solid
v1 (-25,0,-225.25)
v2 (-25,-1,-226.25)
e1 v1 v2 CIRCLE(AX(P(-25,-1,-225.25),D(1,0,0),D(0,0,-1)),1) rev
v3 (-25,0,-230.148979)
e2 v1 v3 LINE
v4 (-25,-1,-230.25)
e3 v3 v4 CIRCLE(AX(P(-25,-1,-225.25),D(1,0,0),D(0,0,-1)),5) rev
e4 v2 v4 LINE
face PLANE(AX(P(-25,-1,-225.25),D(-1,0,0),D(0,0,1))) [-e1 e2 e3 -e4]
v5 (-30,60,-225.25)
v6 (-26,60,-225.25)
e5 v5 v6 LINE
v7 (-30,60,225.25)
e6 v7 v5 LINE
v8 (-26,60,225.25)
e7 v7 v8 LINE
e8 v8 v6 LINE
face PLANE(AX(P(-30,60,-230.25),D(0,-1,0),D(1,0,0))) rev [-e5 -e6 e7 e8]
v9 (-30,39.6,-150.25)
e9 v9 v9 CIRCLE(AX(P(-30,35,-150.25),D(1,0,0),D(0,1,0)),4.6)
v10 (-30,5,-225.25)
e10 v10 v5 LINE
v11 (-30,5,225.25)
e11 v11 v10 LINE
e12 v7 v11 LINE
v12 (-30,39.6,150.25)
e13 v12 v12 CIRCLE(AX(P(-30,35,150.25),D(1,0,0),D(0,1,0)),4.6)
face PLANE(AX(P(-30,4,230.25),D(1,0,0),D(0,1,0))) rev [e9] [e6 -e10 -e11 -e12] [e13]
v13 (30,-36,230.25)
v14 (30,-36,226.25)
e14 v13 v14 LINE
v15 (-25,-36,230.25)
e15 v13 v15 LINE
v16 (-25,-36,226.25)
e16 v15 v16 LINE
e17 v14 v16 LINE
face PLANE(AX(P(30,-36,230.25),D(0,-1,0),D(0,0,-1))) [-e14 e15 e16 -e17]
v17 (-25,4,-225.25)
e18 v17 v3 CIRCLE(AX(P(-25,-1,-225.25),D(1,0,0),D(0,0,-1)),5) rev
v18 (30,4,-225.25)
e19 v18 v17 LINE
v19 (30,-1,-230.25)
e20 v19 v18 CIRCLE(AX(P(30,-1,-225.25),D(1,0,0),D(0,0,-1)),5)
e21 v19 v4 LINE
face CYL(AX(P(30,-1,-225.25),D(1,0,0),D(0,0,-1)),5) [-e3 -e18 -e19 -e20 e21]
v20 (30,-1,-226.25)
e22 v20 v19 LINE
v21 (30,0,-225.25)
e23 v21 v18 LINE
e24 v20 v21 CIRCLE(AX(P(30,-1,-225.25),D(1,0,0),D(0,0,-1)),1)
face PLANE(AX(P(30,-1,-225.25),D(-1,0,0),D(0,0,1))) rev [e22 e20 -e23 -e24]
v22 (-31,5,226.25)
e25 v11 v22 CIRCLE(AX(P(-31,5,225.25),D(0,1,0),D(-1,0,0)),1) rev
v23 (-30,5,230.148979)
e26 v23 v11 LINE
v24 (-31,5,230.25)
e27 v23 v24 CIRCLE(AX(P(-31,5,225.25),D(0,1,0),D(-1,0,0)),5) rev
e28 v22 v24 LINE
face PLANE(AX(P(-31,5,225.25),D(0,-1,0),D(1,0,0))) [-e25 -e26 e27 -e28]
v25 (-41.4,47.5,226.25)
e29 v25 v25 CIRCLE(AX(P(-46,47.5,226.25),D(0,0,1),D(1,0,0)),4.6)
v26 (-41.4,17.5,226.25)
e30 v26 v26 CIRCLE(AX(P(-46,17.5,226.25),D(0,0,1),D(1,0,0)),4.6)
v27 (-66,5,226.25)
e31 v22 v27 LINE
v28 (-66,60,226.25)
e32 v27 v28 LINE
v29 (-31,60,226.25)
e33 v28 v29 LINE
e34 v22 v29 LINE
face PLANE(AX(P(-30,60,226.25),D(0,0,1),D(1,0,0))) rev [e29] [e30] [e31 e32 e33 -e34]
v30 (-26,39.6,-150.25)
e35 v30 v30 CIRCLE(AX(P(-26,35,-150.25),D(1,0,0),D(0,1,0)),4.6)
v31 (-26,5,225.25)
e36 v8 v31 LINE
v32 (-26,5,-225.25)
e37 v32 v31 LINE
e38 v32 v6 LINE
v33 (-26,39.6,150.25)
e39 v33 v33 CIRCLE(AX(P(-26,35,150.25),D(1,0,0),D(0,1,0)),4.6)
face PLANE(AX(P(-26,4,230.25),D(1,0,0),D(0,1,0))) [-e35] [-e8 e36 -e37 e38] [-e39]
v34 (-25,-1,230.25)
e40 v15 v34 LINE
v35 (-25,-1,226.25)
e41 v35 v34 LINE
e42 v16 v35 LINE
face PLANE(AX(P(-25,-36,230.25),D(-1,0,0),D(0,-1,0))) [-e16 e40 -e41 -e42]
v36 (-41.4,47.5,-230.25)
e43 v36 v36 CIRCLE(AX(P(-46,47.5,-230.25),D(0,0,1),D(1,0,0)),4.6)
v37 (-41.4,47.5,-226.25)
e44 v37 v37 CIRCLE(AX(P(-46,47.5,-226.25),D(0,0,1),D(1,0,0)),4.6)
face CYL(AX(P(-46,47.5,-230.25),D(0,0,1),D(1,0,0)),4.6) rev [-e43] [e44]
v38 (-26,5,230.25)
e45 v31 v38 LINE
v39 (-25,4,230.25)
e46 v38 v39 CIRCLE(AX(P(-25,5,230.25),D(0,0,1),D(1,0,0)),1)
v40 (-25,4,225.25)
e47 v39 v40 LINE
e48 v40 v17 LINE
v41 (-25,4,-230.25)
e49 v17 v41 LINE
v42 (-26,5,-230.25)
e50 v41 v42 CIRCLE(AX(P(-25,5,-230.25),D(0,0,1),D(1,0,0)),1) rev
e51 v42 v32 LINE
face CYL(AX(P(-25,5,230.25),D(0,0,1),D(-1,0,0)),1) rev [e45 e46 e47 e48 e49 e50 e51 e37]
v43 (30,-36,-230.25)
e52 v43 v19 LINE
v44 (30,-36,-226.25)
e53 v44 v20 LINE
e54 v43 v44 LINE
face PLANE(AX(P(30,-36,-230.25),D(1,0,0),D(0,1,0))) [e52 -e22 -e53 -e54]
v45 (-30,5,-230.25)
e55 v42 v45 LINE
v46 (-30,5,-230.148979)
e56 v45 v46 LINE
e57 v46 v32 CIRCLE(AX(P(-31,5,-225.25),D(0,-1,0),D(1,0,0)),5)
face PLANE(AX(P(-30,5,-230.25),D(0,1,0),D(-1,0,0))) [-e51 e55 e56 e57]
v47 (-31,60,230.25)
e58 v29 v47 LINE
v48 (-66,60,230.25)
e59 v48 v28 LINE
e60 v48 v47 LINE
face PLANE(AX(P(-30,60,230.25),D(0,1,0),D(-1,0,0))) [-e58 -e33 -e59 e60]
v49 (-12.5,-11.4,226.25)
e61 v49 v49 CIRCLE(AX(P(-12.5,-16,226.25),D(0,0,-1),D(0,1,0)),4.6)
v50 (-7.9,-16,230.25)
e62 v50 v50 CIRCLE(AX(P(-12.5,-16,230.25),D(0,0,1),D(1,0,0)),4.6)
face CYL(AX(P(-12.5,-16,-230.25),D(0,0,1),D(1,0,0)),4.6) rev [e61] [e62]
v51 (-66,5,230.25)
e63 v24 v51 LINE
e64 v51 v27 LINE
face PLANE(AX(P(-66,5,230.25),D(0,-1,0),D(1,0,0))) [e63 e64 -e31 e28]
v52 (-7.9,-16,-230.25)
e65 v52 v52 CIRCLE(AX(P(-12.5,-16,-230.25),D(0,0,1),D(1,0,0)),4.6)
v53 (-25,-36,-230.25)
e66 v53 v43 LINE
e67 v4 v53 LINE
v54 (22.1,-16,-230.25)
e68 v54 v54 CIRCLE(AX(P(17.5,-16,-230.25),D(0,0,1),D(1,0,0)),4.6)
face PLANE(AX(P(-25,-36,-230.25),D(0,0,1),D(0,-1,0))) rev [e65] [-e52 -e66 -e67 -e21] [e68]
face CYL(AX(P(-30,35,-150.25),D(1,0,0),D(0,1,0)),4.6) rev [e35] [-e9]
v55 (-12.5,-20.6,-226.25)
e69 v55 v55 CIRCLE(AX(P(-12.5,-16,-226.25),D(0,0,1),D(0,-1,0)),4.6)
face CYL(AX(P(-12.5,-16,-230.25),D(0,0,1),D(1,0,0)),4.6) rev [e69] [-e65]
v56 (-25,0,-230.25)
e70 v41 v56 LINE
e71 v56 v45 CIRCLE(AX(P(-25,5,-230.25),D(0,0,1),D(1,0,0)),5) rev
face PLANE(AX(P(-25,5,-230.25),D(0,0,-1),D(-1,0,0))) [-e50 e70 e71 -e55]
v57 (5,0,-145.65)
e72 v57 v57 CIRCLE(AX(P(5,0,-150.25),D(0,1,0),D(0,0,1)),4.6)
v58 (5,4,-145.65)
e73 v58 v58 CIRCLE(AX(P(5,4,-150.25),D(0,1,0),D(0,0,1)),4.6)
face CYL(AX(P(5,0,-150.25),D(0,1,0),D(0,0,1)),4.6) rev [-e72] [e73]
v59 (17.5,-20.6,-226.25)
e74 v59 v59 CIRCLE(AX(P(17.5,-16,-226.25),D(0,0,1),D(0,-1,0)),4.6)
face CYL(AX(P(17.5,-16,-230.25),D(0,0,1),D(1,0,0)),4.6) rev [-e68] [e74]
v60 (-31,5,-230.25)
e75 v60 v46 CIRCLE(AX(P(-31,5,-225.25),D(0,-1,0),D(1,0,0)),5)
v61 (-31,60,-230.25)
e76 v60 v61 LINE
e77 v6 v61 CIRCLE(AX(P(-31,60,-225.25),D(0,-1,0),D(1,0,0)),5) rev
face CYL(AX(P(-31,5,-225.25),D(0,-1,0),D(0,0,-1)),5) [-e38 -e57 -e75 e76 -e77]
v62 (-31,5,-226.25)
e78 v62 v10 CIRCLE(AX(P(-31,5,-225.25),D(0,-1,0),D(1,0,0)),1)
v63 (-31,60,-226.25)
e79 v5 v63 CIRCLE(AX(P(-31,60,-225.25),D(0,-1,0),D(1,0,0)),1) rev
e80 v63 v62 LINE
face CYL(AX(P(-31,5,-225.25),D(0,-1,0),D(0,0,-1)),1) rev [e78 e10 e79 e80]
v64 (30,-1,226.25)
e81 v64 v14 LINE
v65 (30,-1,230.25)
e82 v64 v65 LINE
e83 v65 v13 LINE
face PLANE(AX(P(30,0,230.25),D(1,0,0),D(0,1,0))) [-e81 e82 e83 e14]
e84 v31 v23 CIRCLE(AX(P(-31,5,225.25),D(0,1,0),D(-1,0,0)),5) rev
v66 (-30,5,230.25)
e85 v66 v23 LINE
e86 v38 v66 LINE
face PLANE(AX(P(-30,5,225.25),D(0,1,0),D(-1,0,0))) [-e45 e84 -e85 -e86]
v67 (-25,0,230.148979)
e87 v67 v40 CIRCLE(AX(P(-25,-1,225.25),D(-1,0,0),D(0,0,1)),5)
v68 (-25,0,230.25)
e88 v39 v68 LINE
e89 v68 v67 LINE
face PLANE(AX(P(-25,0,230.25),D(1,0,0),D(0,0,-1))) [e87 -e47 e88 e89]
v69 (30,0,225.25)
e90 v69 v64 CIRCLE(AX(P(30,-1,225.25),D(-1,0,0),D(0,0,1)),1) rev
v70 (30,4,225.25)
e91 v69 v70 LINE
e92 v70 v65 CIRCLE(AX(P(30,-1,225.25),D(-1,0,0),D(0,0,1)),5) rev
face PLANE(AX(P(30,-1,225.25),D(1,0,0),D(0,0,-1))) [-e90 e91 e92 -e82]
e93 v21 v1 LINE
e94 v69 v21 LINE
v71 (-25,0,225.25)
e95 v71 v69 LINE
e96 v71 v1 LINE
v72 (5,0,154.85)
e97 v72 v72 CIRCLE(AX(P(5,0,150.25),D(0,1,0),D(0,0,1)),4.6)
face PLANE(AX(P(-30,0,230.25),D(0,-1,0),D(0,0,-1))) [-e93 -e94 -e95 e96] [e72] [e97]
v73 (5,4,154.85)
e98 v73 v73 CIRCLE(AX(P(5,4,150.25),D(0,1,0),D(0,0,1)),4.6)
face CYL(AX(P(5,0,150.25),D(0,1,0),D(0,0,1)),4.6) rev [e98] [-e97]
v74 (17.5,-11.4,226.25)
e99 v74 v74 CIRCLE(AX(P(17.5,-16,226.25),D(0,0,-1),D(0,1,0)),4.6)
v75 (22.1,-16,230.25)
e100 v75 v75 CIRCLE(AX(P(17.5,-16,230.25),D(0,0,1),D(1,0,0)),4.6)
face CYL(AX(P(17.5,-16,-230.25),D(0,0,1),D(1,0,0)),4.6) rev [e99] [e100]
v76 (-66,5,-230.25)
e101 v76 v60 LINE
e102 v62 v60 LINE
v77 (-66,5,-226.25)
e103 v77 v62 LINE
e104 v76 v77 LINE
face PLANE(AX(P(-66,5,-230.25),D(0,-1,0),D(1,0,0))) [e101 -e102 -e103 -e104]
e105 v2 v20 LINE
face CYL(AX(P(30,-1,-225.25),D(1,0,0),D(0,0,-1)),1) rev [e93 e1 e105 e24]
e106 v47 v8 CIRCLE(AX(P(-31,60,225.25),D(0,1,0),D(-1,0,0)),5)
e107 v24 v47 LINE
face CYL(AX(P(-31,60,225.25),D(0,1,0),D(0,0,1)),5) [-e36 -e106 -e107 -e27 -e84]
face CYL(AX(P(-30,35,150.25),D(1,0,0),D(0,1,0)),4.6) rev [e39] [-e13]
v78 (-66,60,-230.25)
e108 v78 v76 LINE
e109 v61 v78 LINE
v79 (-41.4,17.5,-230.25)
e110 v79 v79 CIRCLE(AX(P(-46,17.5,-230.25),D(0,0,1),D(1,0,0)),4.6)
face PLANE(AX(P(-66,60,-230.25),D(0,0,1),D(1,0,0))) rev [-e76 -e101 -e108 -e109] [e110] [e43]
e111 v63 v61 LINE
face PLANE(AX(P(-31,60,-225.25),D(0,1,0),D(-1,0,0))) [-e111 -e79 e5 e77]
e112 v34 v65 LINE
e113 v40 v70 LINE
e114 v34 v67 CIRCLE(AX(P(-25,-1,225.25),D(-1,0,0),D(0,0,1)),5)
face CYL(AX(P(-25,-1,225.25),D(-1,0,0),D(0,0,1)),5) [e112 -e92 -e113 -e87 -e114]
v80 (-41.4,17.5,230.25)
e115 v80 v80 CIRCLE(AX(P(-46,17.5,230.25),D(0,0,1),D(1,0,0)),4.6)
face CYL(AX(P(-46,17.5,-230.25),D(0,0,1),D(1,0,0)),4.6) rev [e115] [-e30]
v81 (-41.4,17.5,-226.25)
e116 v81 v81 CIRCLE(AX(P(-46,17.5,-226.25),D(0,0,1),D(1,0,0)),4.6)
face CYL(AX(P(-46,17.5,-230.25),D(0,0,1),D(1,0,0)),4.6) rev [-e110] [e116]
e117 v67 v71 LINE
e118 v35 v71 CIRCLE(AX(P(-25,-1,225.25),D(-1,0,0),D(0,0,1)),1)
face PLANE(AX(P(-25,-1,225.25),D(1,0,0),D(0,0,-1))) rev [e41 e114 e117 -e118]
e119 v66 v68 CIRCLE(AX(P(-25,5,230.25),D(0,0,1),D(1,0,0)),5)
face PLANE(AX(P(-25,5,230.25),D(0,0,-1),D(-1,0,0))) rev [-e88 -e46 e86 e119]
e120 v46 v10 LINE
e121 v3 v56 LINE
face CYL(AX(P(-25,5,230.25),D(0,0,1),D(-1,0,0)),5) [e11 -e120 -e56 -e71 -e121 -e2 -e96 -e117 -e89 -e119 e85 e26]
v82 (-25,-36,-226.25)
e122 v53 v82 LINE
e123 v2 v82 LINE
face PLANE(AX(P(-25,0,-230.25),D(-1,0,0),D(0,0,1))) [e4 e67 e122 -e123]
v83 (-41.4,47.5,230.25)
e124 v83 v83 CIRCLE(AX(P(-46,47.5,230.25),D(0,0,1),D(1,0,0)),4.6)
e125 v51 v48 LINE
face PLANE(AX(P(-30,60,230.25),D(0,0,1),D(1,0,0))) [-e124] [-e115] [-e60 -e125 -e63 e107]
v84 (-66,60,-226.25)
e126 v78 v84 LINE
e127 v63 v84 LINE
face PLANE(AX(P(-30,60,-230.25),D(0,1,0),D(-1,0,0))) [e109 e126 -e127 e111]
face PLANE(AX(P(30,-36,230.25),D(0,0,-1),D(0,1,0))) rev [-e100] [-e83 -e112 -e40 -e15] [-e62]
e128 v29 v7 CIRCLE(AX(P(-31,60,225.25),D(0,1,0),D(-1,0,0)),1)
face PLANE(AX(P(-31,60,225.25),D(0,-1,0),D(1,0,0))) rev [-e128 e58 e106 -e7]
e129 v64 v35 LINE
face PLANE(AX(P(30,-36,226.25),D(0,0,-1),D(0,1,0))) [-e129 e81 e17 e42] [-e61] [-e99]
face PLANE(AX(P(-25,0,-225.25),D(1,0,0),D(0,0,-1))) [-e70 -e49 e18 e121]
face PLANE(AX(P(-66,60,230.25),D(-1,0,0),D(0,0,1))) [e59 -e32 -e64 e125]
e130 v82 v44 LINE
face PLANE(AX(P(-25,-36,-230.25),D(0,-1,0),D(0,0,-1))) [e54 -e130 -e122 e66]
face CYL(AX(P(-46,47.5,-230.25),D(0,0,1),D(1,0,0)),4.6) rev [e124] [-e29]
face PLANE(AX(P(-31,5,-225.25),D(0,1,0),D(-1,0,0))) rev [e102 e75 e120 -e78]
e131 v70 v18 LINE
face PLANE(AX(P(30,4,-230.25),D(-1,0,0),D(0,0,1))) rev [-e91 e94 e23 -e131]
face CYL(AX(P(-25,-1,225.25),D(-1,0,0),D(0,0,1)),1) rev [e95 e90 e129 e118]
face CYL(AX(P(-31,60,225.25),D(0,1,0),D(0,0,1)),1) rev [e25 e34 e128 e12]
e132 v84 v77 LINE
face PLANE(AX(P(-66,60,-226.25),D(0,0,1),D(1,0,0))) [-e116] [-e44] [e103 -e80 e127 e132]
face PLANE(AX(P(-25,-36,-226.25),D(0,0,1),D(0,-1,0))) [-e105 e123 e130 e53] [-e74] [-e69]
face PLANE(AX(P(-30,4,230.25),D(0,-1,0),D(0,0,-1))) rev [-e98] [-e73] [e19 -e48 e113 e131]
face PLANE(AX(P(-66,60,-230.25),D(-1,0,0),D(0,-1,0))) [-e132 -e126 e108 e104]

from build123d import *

# Parameters (mm, degrees)
SKETCH1_W                      = 60
SKETCH1_H                      = 460.5
BASE_FLANGE1_DEPTH             = 4
EDGE_FLANGE1_STRIP_W           = 18
EDGE_FLANGE1_STRIP_H           = 4
EDGE_FLANGE1_STRIP_CUT_DEPTH   = 460.5
EDGE_FLANGE1_DEPTH             = 460.5
EDGE_FLANGE2_STRIP_W           = 18
EDGE_FLANGE2_STRIP_H           = 4
EDGE_FLANGE2_STRIP_CUT_DEPTH   = 55
EDGE_FLANGE2_STRIP_2_W         = 18
EDGE_FLANGE2_STRIP_2_H         = 4
EDGE_FLANGE2_STRIP_CUT_2_DEPTH = 55
EDGE_FLANGE2_STRIP_3_W         = 18
EDGE_FLANGE2_STRIP_3_H         = 4
EDGE_FLANGE2_STRIP_CUT_3_DEPTH = 55
EDGE_FLANGE2_STRIP_4_W         = 18
EDGE_FLANGE2_STRIP_4_H         = 4
EDGE_FLANGE2_STRIP_CUT_4_DEPTH = 55
EDGE_FLANGE2_DEPTH             = 55
EDGE_FLANGE2_BEND_DEPTH        = 55
EDGE_FLANGE2_BEND_2_DEPTH      = 55
EDGE_FLANGE2_BEND_3_DEPTH      = 55
SKETCH18_R                     = 4.6
EXTRUDE1_DEPTH                 = 470.058898221
SKETCH19_R                     = 4.6
EXTRUDE2_DEPTH                 = 4
SKETCH20_R                     = 4.6
EXTRUDE3_DEPTH                 = 4


# Sheet-metal steps are written as plain solids
with BuildPart() as part:
    # Sketch1 → Base-Flange1 (new body)
    with BuildSketch(Plane(origin=(0, 0, 0), x_dir=(1, 0, 0), z_dir=(0, 1, 0))):
        Rectangle(SKETCH1_W, SKETCH1_H)
    extrude(amount=BASE_FLANGE1_DEPTH)

    # Edge-Flange1 strip (across the edge) → Edge-Flange1 strip cut (cut)
    with BuildSketch(Plane(origin=(-30, 4, -230.25), x_dir=(1, 0, 0), z_dir=(0, 0, 1))):
        with Locations((-4, -2)):
            Rectangle(EDGE_FLANGE1_STRIP_W, EDGE_FLANGE1_STRIP_H)
    extrude(amount=EDGE_FLANGE1_STRIP_CUT_DEPTH, mode=Mode.SUBTRACT)

    # Edge-Flange1 section (across the edge) → Edge-Flange1 (add)
    with BuildSketch(Plane(origin=(-30, 4, -230.25), x_dir=(1, 0, 0), z_dir=(0, 0, 1))):
        with BuildLine():
            Line((0, 1), (0, 56))
            Line((0, 56), (4, 56))
            Line((4, 56), (4, 1))
            ThreePointArc((4, 1), (4.292893219, 0.292893219), (5, 0))
            Line((5, 0), (5, -4))
            ThreePointArc((5, -4), (1.464466094, -2.535533906), (0, 1))
        make_face()
    extrude(amount=EDGE_FLANGE1_DEPTH)

    # Edge-Flange2 strip (across the edge) → Edge-Flange2 strip cut (cut)
    with BuildSketch(Plane(origin=(-30, 5, 230.25), x_dir=(0, 0, -1), z_dir=(0, 1, 0))):
        with Locations((-4, -2)):
            Rectangle(EDGE_FLANGE2_STRIP_W, EDGE_FLANGE2_STRIP_H)
    extrude(amount=EDGE_FLANGE2_STRIP_CUT_DEPTH, mode=Mode.SUBTRACT)

    # Edge-Flange2 strip 2 (across the edge) → Edge-Flange2 strip cut 2 (cut)
    with BuildSketch(Plane(origin=(30, 0, 230.25), x_dir=(0, 0, -1), z_dir=(-1, 0, 0))):
        with Locations((-4, -2)):
            Rectangle(EDGE_FLANGE2_STRIP_2_W, EDGE_FLANGE2_STRIP_2_H)
    extrude(amount=EDGE_FLANGE2_STRIP_CUT_2_DEPTH, mode=Mode.SUBTRACT)

    # Edge-Flange2 strip 3 (across the edge) → Edge-Flange2 strip cut 3 (cut)
    with BuildSketch(Plane(origin=(-30, 60, -230.25), x_dir=(0, 0, 1), z_dir=(0, -1, 0))):
        with Locations((-4, -2)):
            Rectangle(EDGE_FLANGE2_STRIP_3_W, EDGE_FLANGE2_STRIP_3_H)
    extrude(amount=EDGE_FLANGE2_STRIP_CUT_3_DEPTH, mode=Mode.SUBTRACT)

    # Edge-Flange2 strip 4 (across the edge) → Edge-Flange2 strip cut 4 (cut)
    with BuildSketch(Plane(origin=(-25, 0, -230.25), x_dir=(0, 0, 1), z_dir=(1, 0, 0))):
        with Locations((-4, -2)):
            Rectangle(EDGE_FLANGE2_STRIP_4_W, EDGE_FLANGE2_STRIP_4_H)
    extrude(amount=EDGE_FLANGE2_STRIP_CUT_4_DEPTH, mode=Mode.SUBTRACT)

    # Edge-Flange2 section (across the edge) → Edge-Flange2 (add)
    with BuildSketch(Plane(origin=(-30, 5, 230.25), x_dir=(0, 0, -1), z_dir=(0, 1, 0))):
        with BuildLine():
            Line((0, 1), (0, 36))
            Line((0, 36), (4, 36))
            Line((4, 36), (4, 1))
            ThreePointArc((4, 1), (4.292893219, 0.292893219), (5, 0))
            Line((5, 0), (5, -4))
            ThreePointArc((5, -4), (1.464466094, -2.535533906), (0, 1))
        make_face()
    extrude(amount=EDGE_FLANGE2_DEPTH)

    # Edge-Flange2 section 2 (across the edge) → Edge-Flange2 bend (add)
    with BuildSketch(Plane(origin=(30, 0, 230.25), x_dir=(0, 0, -1), z_dir=(-1, 0, 0))):
        with BuildLine():
            Line((0, 1), (0, 36))
            Line((0, 36), (4, 36))
            Line((4, 36), (4, 1))
            ThreePointArc((4, 1), (4.292893219, 0.292893219), (5, 0))
            Line((5, 0), (5, -4))
            ThreePointArc((5, -4), (1.464466094, -2.535533906), (0, 1))
        make_face()
    extrude(amount=EDGE_FLANGE2_BEND_DEPTH)

    # Edge-Flange2 section 3 (across the edge) → Edge-Flange2 bend 2 (add)
    with BuildSketch(Plane(origin=(-30, 60, -230.25), x_dir=(0, 0, 1), z_dir=(0, -1, 0))):
        with BuildLine():
            Line((0, 1), (0, 36))
            Line((0, 36), (4, 36))
            Line((4, 36), (4, 1))
            ThreePointArc((4, 1), (4.292893219, 0.292893219), (5, 0))
            Line((5, 0), (5, -4))
            ThreePointArc((5, -4), (1.464466094, -2.535533906), (0, 1))
        make_face()
    extrude(amount=EDGE_FLANGE2_BEND_2_DEPTH)

    # Edge-Flange2 section 4 (across the edge) → Edge-Flange2 bend 3 (add)
    with BuildSketch(Plane(origin=(-25, 0, -230.25), x_dir=(0, 0, 1), z_dir=(1, 0, 0))):
        with BuildLine():
            Line((0, 1), (0, 36))
            Line((0, 36), (4, 36))
            Line((4, 36), (4, 1))
            ThreePointArc((4, 1), (4.292893219, 0.292893219), (5, 0))
            Line((5, 0), (5, -4))
            ThreePointArc((5, -4), (1.464466094, -2.535533906), (0, 1))
        make_face()
    extrude(amount=EDGE_FLANGE2_BEND_3_DEPTH)

    # Sketch18 → Extrude1 (cut, through all)
    with BuildSketch(Plane.XY.offset(230.25)):
        with Locations((-46, 47.5)):
            Circle(SKETCH18_R)
        with Locations((-46, 17.5)):
            Circle(SKETCH18_R)
        with Locations((-12.5, -16)):
            Circle(SKETCH18_R)
        with Locations((17.5, -16)):
            Circle(SKETCH18_R)
    extrude(amount=-EXTRUDE1_DEPTH, mode=Mode.SUBTRACT)

    # Sketch19 → Extrude2 (cut)
    with BuildSketch(Plane(origin=(-26, 0, 0), x_dir=(0, 0, -1), z_dir=(1, 0, 0))):
        with Locations(Location((-150.25, 35, 0), (0, 0, 90))):
            Circle(SKETCH19_R)
        with Locations(Location((150.25, 35, 0), (0, 0, 90))):
            Circle(SKETCH19_R)
    extrude(amount=-EXTRUDE2_DEPTH, mode=Mode.SUBTRACT)

    # Sketch20 → Extrude3 (cut)
    with BuildSketch(Plane(origin=(0, 4, 0), x_dir=(1, 0, 0), z_dir=(0, 1, 0))):
        with Locations(Location((5, 150.25, 0), (0, 0, 270))):
            Circle(SKETCH20_R)
        with Locations(Location((5, -150.25, 0), (0, 0, 270))):
            Circle(SKETCH20_R)
    extrude(amount=-EXTRUDE3_DEPTH, mode=Mode.SUBTRACT)


solid = part.part
